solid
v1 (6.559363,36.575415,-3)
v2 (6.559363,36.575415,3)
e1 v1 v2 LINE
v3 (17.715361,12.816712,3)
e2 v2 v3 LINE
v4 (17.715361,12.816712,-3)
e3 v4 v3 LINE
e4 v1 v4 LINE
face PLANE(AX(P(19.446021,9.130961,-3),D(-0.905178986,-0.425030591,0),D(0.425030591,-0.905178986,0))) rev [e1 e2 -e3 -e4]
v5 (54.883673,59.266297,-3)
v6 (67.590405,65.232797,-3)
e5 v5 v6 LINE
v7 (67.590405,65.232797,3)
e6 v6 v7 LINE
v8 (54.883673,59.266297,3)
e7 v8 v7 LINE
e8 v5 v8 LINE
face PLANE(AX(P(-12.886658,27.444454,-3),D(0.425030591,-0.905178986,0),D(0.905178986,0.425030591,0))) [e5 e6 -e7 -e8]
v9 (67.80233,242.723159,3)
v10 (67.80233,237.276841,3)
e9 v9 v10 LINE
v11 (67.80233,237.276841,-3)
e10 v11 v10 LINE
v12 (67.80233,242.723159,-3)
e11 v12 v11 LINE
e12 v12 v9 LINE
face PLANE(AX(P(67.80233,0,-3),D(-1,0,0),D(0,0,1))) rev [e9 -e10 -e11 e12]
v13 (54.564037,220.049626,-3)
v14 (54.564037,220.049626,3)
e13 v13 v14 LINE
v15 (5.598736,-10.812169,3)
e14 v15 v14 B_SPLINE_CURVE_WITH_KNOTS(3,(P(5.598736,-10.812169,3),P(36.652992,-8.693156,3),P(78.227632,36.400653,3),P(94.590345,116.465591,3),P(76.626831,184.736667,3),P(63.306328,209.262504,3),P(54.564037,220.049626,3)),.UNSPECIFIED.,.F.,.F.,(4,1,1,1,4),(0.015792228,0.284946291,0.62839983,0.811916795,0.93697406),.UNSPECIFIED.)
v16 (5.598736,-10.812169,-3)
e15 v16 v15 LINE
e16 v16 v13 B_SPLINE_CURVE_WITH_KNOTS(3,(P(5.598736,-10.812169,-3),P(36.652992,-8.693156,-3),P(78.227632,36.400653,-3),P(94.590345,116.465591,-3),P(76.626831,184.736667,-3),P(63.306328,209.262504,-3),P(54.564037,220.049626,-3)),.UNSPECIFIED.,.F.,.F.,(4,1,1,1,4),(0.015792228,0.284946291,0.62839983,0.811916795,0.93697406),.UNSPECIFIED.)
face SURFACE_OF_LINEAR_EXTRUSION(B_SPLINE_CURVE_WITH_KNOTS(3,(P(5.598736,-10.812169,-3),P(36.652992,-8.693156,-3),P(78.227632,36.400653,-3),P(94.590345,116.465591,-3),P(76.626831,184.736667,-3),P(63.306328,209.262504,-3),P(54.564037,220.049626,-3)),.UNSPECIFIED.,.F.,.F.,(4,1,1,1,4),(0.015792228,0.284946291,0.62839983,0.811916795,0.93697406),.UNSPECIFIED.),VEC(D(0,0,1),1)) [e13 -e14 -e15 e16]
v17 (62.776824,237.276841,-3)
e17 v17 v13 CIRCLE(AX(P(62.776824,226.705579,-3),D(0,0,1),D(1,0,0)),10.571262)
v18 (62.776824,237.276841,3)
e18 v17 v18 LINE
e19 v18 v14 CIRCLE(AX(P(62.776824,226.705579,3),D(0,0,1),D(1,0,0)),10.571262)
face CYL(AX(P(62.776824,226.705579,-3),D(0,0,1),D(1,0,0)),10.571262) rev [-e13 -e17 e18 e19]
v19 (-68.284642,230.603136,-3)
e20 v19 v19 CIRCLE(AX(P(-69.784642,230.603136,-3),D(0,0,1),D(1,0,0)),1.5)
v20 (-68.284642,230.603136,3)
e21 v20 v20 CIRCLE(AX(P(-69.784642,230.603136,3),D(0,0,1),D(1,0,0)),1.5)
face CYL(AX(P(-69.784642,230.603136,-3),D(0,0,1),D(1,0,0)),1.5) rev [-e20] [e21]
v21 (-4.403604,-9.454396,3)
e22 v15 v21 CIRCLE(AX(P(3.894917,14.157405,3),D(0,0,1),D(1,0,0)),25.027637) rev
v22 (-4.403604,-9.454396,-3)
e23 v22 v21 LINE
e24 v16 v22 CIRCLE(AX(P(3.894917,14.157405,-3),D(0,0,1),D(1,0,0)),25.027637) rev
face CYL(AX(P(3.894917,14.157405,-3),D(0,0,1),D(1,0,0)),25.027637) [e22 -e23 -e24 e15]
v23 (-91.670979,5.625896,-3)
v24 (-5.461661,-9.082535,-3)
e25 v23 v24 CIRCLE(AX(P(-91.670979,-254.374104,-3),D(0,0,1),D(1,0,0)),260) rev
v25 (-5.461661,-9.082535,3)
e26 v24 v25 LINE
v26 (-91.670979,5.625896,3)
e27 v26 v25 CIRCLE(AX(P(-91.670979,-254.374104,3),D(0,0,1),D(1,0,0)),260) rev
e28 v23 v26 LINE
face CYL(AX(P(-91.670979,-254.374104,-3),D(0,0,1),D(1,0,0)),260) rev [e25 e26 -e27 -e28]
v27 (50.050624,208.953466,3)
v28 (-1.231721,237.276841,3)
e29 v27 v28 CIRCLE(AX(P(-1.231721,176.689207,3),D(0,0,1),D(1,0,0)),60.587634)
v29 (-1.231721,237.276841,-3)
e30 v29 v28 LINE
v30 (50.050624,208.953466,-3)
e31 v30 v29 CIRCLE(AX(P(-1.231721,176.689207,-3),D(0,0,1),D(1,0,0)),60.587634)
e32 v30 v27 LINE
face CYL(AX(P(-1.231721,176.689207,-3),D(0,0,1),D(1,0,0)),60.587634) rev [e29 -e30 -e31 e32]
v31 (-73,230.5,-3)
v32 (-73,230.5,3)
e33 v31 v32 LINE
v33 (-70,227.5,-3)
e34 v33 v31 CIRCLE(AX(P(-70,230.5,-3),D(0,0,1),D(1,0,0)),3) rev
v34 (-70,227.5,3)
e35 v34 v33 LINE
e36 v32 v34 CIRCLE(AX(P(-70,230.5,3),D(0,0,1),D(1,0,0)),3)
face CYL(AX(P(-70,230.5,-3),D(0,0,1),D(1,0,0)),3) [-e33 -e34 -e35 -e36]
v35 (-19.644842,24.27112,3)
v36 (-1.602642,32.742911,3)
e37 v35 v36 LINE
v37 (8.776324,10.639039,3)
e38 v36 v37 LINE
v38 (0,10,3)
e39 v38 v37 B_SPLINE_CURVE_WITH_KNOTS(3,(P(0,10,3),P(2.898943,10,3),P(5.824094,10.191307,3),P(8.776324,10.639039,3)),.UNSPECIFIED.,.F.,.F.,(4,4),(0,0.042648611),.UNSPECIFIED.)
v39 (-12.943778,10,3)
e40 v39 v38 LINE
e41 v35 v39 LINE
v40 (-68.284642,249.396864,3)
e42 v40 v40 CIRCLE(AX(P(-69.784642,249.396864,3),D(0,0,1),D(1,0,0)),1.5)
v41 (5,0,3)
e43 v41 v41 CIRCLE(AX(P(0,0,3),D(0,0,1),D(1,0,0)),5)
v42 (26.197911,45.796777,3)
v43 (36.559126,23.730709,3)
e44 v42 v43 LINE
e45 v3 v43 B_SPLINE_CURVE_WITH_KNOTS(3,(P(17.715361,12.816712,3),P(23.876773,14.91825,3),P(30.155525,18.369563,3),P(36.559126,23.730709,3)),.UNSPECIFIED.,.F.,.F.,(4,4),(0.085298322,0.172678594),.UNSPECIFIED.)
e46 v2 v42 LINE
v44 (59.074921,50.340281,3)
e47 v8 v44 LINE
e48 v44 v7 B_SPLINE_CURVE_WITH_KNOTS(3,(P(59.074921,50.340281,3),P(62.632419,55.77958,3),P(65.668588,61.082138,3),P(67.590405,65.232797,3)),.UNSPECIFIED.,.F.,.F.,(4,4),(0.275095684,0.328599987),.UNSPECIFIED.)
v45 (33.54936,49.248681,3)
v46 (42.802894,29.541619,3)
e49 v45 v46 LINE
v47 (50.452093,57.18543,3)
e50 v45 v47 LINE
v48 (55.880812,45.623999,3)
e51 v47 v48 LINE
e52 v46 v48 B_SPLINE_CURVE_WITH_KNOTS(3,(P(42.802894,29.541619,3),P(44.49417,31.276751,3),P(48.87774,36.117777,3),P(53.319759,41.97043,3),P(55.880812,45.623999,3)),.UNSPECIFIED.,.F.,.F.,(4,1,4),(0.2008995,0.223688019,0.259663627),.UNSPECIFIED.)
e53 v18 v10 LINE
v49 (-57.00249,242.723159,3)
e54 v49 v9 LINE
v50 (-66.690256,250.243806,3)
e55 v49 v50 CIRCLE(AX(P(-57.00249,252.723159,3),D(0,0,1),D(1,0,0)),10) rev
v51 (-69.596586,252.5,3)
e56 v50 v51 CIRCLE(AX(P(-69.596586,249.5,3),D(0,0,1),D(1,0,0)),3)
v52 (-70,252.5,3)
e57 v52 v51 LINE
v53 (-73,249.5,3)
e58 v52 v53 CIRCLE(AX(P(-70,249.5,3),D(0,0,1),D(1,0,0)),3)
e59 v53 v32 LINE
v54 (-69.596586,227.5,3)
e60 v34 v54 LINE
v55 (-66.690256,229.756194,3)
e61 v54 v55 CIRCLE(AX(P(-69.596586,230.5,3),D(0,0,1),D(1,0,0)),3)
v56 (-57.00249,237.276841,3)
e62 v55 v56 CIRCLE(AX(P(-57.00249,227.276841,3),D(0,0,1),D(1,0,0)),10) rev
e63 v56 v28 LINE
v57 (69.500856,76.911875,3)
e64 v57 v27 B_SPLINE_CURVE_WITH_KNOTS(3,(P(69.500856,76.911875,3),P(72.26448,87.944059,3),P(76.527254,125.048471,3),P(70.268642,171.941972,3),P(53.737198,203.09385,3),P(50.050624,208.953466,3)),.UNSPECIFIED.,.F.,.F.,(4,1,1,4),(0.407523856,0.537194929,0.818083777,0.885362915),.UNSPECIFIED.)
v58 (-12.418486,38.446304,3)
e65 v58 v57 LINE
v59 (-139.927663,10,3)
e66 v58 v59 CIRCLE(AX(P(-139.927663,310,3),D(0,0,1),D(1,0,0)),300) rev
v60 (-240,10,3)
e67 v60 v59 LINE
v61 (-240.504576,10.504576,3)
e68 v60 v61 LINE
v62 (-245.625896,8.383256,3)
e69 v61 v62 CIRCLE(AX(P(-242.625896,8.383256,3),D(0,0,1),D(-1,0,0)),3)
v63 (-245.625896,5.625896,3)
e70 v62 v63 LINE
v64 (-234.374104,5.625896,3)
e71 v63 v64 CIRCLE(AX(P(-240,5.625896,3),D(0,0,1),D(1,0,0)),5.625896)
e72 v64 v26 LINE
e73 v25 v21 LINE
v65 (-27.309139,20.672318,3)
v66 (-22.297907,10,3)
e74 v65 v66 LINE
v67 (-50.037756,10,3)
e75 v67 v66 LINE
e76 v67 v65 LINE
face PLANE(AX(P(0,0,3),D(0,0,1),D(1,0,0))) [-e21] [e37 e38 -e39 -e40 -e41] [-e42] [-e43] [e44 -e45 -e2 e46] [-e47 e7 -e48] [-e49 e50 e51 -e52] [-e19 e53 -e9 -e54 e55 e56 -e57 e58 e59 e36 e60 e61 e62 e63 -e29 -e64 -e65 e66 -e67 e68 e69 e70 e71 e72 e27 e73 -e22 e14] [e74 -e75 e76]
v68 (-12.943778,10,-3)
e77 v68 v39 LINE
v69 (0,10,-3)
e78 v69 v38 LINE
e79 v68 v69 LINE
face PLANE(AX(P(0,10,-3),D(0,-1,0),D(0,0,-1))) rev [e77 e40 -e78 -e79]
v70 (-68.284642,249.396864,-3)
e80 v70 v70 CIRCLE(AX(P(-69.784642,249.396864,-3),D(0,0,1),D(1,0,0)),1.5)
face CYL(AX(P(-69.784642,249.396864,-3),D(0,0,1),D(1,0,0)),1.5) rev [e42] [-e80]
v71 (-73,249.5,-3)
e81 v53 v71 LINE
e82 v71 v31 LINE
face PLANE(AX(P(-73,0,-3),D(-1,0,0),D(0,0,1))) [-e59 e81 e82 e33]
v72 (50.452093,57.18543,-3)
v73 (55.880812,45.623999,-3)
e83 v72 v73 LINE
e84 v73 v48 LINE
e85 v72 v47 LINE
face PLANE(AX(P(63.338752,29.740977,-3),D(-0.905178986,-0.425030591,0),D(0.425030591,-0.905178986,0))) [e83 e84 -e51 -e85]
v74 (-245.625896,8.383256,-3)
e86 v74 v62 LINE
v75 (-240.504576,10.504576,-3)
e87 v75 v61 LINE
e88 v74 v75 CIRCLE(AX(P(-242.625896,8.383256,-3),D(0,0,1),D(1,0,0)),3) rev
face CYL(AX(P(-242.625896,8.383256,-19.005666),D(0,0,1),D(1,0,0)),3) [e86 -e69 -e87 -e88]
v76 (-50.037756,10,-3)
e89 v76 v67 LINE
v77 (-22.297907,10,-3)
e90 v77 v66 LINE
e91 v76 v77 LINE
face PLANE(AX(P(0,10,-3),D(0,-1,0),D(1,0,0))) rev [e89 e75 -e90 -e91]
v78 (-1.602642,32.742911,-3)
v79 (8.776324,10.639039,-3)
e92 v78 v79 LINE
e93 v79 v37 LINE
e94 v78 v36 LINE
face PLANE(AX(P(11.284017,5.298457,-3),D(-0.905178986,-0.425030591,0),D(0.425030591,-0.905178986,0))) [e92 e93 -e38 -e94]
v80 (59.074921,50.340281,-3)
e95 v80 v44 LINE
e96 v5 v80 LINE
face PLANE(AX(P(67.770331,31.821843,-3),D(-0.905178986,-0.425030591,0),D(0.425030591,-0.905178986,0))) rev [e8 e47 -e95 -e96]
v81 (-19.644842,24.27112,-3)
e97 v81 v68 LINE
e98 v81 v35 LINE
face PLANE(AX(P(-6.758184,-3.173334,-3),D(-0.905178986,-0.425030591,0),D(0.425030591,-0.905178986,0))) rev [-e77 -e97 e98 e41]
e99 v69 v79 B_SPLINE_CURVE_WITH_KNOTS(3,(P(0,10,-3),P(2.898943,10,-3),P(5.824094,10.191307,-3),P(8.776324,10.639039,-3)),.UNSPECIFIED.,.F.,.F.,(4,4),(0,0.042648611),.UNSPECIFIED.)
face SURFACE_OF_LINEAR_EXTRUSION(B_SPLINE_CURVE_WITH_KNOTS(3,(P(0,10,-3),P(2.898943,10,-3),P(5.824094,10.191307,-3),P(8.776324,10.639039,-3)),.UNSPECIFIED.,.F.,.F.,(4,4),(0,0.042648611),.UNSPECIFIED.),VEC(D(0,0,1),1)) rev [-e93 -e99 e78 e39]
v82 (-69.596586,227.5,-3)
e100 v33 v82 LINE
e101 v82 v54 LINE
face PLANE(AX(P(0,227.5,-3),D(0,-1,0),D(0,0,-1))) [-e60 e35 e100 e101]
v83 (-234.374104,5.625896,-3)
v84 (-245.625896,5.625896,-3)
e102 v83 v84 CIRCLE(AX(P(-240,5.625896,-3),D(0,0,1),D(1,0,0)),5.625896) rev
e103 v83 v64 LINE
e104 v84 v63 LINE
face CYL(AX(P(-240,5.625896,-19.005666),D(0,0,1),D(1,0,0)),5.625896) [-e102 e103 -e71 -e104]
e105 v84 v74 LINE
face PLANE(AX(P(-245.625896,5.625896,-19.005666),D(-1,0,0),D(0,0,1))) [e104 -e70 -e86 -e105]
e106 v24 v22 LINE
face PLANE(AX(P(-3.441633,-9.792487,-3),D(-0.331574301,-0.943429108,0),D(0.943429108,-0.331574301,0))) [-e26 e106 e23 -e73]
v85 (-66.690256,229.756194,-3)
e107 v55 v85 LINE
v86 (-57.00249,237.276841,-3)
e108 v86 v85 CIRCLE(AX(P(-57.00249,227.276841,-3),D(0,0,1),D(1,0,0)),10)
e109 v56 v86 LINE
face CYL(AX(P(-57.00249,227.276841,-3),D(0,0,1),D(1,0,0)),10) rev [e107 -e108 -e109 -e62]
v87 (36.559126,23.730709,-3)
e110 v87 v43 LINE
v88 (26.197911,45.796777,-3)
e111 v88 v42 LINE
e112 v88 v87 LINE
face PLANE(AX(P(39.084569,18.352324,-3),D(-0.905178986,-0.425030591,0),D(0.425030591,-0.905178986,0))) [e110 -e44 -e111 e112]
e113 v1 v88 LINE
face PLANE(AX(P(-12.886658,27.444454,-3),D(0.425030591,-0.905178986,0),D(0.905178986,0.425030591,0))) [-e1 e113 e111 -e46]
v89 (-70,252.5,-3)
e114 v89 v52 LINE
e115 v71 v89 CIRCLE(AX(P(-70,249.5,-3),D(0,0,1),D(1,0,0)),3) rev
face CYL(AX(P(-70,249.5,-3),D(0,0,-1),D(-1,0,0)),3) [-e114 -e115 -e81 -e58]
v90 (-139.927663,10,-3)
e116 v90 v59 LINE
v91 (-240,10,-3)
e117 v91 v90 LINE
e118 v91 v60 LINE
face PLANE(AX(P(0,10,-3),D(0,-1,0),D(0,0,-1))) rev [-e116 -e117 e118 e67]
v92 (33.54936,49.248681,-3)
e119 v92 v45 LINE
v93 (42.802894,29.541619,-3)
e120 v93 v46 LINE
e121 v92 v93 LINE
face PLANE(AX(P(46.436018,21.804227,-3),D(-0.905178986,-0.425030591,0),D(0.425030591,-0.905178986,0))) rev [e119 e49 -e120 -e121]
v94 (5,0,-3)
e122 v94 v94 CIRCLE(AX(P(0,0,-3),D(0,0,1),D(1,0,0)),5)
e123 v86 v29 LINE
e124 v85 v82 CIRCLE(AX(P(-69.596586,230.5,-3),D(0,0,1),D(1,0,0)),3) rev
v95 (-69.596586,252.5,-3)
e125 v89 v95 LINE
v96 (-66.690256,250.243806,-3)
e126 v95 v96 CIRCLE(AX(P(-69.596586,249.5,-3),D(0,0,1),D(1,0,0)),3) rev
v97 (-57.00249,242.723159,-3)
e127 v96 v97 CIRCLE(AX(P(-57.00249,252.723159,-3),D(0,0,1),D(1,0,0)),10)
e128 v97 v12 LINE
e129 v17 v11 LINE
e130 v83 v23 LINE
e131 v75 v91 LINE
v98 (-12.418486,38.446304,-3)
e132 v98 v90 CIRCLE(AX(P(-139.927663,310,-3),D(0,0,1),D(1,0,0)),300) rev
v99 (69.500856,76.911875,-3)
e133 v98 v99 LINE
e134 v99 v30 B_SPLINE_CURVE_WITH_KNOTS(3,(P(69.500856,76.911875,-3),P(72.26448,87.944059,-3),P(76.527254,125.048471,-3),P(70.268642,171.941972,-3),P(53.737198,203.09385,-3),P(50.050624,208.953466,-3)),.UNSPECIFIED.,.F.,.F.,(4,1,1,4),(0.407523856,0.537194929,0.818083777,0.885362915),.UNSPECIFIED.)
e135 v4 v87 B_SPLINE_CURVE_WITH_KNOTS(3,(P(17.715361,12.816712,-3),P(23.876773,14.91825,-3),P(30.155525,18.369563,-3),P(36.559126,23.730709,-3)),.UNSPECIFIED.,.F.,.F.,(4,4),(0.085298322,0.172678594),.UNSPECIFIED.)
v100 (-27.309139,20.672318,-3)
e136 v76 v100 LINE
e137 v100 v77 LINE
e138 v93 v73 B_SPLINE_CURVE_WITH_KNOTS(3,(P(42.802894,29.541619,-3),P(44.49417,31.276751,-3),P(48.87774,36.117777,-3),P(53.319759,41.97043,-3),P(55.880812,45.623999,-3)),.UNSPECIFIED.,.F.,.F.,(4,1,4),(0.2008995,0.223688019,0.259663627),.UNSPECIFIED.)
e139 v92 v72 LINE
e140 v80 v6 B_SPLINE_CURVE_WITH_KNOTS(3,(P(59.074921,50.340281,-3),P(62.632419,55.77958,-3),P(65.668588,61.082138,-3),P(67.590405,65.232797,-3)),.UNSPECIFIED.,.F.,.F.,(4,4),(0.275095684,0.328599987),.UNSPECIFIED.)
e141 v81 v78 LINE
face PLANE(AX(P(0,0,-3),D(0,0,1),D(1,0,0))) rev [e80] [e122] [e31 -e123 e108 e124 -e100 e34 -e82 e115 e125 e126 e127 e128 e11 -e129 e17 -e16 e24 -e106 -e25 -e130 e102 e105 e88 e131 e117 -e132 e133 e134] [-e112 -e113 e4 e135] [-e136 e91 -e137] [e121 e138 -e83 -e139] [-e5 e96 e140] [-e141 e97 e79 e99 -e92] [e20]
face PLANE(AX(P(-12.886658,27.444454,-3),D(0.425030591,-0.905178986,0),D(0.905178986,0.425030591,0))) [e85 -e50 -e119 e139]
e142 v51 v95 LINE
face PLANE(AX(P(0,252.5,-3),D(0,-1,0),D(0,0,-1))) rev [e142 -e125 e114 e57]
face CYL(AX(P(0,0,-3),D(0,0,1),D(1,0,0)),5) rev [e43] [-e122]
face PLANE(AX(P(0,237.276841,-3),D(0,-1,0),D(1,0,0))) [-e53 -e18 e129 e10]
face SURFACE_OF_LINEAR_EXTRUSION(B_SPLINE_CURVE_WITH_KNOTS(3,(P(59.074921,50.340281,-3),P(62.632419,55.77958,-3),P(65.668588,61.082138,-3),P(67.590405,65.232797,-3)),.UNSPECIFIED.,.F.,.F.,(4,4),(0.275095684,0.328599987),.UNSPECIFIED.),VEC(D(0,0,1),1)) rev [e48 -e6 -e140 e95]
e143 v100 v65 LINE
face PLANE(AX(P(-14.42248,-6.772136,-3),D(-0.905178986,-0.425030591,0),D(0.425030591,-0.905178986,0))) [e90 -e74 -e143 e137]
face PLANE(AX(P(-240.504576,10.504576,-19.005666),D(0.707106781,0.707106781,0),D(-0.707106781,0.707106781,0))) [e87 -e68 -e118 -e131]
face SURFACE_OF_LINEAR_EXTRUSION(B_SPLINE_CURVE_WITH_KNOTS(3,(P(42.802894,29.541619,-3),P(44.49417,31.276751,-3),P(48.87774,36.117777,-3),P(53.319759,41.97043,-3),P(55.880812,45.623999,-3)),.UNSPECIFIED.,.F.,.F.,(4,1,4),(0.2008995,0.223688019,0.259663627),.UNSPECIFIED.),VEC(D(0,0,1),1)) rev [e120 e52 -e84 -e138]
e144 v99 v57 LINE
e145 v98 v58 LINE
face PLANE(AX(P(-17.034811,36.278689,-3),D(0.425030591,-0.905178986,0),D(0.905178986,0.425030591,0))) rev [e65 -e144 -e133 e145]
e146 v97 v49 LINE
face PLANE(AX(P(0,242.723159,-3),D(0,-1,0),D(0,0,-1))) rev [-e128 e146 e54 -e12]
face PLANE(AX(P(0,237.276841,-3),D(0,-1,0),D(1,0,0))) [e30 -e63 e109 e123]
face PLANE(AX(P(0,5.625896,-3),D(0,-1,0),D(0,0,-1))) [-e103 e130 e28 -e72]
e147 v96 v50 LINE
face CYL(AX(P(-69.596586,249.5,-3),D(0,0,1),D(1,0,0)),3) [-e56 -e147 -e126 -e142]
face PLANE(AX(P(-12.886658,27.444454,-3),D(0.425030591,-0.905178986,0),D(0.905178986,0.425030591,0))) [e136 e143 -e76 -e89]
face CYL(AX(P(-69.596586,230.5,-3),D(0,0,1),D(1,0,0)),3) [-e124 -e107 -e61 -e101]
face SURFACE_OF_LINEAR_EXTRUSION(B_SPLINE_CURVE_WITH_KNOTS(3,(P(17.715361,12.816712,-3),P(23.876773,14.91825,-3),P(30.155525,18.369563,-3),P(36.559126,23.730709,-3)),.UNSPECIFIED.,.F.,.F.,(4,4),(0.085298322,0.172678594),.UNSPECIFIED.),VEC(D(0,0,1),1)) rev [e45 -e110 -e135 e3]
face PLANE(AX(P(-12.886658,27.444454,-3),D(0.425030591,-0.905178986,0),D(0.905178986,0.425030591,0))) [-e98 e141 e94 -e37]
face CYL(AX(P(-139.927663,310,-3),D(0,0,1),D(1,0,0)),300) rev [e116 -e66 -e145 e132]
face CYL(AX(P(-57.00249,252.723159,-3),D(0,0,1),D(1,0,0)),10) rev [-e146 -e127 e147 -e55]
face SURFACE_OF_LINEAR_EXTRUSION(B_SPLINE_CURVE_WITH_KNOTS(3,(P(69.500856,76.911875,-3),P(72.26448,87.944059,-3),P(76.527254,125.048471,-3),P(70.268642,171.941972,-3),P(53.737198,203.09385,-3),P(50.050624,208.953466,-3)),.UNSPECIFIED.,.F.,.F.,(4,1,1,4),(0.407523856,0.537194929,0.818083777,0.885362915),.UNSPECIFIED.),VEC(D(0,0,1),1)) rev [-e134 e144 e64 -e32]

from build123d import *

# Parameters (mm, degrees)
BOSS_EXTRUDE1_DEPTH      = 3
BOSS_EXTRUDE1_DEPTH_BACK = 3
SKETCH1_R                = 5
FILLET1_START            = -3
FILLET1_DEPTH            = 6
SKETCH3_R                = 1.5
CUT_EXTRUDE1_DEPTH       = 349.413906295
FILLET2_R                = 3
BOSS_EXTRUDE2_DEPTH      = 6


with BuildPart() as part:
    # Sketch1 → Boss-Extrude1 (new, two sides: drawn at the far end of the back side and taken through both)
    with BuildSketch(Plane.XY.offset(-BOSS_EXTRUDE1_DEPTH_BACK)):
        with BuildLine():
            Line((-139.927663014, 10), (-240, 10))
            Line((-240, 10), (-240, 5.625896326))
            Line((-240, 5.625896326), (-91.67097898, 5.625896326))
            ThreePointArc((-91.67097898, 5.625896326), (-47.943457504, 1.922411841), (-5.461660623, -9.082535478))
            Line((-5.461660623, -9.082535478), (-4.403604208, -9.454396292))
            ThreePointArc((-4.403604208, -9.454396292), (0.528404036, -10.64278059), (5.598736393, -10.81216877))
            add(Edge.make_bspline(
                [(5.598736393, -10.81216877), (36.652992265, -8.693156062), (78.227632244, 36.40065328), (94.590344538, 116.465590815), (76.626831013, 184.736667386), (63.306328088, 209.262504208), (54.564036902, 220.049625577)],
                knots=[0.015792228, 0.015792228, 0.015792228, 0.015792228, 0.284946291, 0.62839983, 0.811916795, 0.93697406, 0.93697406, 0.93697406, 0.93697406], degree=3))
            ThreePointArc((54.564036902, 220.049625577), (53.234460191, 231.254741201), (62.776823889, 237.276840954))
            Line((62.776823889, 237.276840954), (67.80233028, 237.276840954))
            Line((67.80233028, 237.276840954), (67.80233028, 242.723159046))
            Line((67.80233028, 242.723159046), (-67, 242.723159046))
            Line((-67, 242.723159046), (-67, 252.5))
            Line((-67, 252.5), (-73, 252.5))
            Line((-73, 252.5), (-73, 227.5))
            Line((-73, 227.5), (-67, 227.5))
            Line((-67, 227.5), (-67, 237.276840954))
            Line((-67, 237.276840954), (-1.231721128, 237.276840954))
            ThreePointArc((-1.231721128, 237.276840954), (28.060310534, 229.72540467), (50.050624082, 208.953466413))
            add(Edge.make_bspline(
                [(69.500855603, 76.911874598), (72.264480227, 87.944058505), (76.527253704, 125.048471021), (70.268641745, 171.941971612), (53.737198263, 203.093850369), (50.050624082, 208.953466413)],
                knots=[0.407523856, 0.407523856, 0.407523856, 0.407523856, 0.537194929, 0.818083777, 0.885362915, 0.885362915, 0.885362915, 0.885362915], degree=3))
            Line((69.500855603, 76.911874598), (-12.418485843, 38.446304136))
            ThreePointArc((-12.418485843, 38.446304136), (-74.60580128, 17.197926272), (-139.927663014, 10))
        make_face()
        Polygon((-22.297907079, 10), (-50.037756473, 10), (-27.309138693, 20.672317834), align=None, mode=Mode.SUBTRACT)
        Circle(SKETCH1_R, mode=Mode.SUBTRACT)
        with BuildLine():
            Line((-12.943777745, 10), (-19.644842204, 24.271120406))
            Line((-19.644842204, 24.271120406), (-1.602641824, 32.742911289))
            Line((-1.602641824, 32.742911289), (8.776324123, 10.639039044))
            add(Edge.make_bspline(
                [(0, 10), (2.898943299, 10), (5.824093664, 10.191306611), (8.776324123, 10.639039044)],
                knots=[0, 0, 0, 0, 0.042648611, 0.042648611, 0.042648611, 0.042648611], degree=3))
            Line((0, 10), (-12.943777745, 10))
        make_face(mode=Mode.SUBTRACT)
        with BuildLine():
            Line((17.715361457, 12.81671237), (6.559363007, 36.5754149))
            Line((6.559363007, 36.5754149), (26.197910912, 45.79677746))
            Line((26.197910912, 45.79677746), (36.559125948, 23.730708969))
            add(Edge.make_bspline(
                [(17.715361457, 12.81671237), (23.876773005, 14.918250482), (30.155524994, 18.369562648), (36.559125948, 23.730708969)],
                knots=[0.085298322, 0.085298322, 0.085298322, 0.085298322, 0.172678594, 0.172678594, 0.172678594, 0.172678594], degree=3))
        make_face(mode=Mode.SUBTRACT)
        with BuildLine():
            Line((42.802893804, 29.541618599), (33.549359894, 49.248681172))
            Line((33.549359894, 49.248681172), (50.452093063, 57.185430446))
            Line((50.452093063, 57.185430446), (55.88081154, 45.623999347))
            add(Edge.make_bspline(
                [(42.802893804, 29.541618599), (44.494170175, 31.276751032), (48.877740455, 36.117777074), (53.319758571, 41.97043023), (55.88081154, 45.623999347)],
                knots=[0.2008995, 0.2008995, 0.2008995, 0.2008995, 0.223688019, 0.259663627, 0.259663627, 0.259663627, 0.259663627], degree=3))
        make_face(mode=Mode.SUBTRACT)
        with BuildLine():
            Line((59.074920902, 50.340281449), (54.883672726, 59.266297269))
            Line((54.883672726, 59.266297269), (67.59040472, 65.232796586))
            add(Edge.make_bspline(
                [(59.074920902, 50.340281449), (62.63241948, 55.77958039), (65.668587928, 61.082137876), (67.59040472, 65.232796586)],
                knots=[0.275095684, 0.275095684, 0.275095684, 0.275095684, 0.328599987, 0.328599987, 0.328599987, 0.328599987], degree=3))
        make_face(mode=Mode.SUBTRACT)
    extrude(amount=BOSS_EXTRUDE1_DEPTH + BOSS_EXTRUDE1_DEPTH_BACK)

    # Fillet1: read off the stored shape, not the designer's step
    # Fillet1 outline → Fillet1 (add)
    with BuildSketch(Plane.XY.offset(FILLET1_START)):
        with BuildLine():
            ThreePointArc((-57.002490308, 242.723159046), (-63.994214328, 245.573627926), (-67, 252.5))
            Line((-67, 252.5), (-67, 242.723159046))
            Line((-67, 242.723159046), (-57.002490308, 242.723159046))
        make_face()
        with BuildLine():
            ThreePointArc((-67, 227.5), (-63.994214328, 234.426372074), (-57.002490308, 237.276840954))
            Line((-57.002490308, 237.276840954), (-67, 237.276840954))
            Line((-67, 237.276840954), (-67, 227.5))
        make_face()
    extrude(amount=FILLET1_DEPTH)

    # Sketch3 → Cut-Extrude1 (cut, through all)
    with BuildSketch(Plane.XY.offset(3)):
        with Locations((-69.784641705, 249.396863572)):
            Circle(SKETCH3_R)
        with Locations((-69.784641705, 230.603136428)):
            Circle(SKETCH3_R)
    extrude(amount=-CUT_EXTRUDE1_DEPTH, mode=Mode.SUBTRACT)

    # Fillet2
    fillet2_edges = [part.edges().sort_by_distance(p)[0] for p in [
        (-67, 227.5, 0),
        (-73, 227.5, 0),
        (-73, 252.5, 0),
        (-67, 252.5, 0),
    ]]
    fillet(fillet2_edges, radius=FILLET2_R)

    # Sketch4 → Boss-Extrude2 (add)
    with BuildSketch(Plane.XY.offset(3)):
        with BuildLine():
            Line((-245.625896326, 5.625896326), (-245.625896326, 8.383255638))
            ThreePointArc((-245.625896326, 8.383255638), (-243.773946623, 11.154894236), (-240.504575982, 10.504575982))
            Line((-240.504575982, 10.504575982), (-240, 10))
            Line((-240, 10), (-240, 6.942968022))
            Line((-240, 6.942968022), (-240, 5.625896326))
            Line((-240, 5.625896326), (-234.374103674, 5.625896326))
            ThreePointArc((-234.374103674, 5.625896326), (-240, 0), (-245.625896326, 5.625896326))
        make_face()
    extrude(amount=-BOSS_EXTRUDE2_DEPTH)


solid = part.part
